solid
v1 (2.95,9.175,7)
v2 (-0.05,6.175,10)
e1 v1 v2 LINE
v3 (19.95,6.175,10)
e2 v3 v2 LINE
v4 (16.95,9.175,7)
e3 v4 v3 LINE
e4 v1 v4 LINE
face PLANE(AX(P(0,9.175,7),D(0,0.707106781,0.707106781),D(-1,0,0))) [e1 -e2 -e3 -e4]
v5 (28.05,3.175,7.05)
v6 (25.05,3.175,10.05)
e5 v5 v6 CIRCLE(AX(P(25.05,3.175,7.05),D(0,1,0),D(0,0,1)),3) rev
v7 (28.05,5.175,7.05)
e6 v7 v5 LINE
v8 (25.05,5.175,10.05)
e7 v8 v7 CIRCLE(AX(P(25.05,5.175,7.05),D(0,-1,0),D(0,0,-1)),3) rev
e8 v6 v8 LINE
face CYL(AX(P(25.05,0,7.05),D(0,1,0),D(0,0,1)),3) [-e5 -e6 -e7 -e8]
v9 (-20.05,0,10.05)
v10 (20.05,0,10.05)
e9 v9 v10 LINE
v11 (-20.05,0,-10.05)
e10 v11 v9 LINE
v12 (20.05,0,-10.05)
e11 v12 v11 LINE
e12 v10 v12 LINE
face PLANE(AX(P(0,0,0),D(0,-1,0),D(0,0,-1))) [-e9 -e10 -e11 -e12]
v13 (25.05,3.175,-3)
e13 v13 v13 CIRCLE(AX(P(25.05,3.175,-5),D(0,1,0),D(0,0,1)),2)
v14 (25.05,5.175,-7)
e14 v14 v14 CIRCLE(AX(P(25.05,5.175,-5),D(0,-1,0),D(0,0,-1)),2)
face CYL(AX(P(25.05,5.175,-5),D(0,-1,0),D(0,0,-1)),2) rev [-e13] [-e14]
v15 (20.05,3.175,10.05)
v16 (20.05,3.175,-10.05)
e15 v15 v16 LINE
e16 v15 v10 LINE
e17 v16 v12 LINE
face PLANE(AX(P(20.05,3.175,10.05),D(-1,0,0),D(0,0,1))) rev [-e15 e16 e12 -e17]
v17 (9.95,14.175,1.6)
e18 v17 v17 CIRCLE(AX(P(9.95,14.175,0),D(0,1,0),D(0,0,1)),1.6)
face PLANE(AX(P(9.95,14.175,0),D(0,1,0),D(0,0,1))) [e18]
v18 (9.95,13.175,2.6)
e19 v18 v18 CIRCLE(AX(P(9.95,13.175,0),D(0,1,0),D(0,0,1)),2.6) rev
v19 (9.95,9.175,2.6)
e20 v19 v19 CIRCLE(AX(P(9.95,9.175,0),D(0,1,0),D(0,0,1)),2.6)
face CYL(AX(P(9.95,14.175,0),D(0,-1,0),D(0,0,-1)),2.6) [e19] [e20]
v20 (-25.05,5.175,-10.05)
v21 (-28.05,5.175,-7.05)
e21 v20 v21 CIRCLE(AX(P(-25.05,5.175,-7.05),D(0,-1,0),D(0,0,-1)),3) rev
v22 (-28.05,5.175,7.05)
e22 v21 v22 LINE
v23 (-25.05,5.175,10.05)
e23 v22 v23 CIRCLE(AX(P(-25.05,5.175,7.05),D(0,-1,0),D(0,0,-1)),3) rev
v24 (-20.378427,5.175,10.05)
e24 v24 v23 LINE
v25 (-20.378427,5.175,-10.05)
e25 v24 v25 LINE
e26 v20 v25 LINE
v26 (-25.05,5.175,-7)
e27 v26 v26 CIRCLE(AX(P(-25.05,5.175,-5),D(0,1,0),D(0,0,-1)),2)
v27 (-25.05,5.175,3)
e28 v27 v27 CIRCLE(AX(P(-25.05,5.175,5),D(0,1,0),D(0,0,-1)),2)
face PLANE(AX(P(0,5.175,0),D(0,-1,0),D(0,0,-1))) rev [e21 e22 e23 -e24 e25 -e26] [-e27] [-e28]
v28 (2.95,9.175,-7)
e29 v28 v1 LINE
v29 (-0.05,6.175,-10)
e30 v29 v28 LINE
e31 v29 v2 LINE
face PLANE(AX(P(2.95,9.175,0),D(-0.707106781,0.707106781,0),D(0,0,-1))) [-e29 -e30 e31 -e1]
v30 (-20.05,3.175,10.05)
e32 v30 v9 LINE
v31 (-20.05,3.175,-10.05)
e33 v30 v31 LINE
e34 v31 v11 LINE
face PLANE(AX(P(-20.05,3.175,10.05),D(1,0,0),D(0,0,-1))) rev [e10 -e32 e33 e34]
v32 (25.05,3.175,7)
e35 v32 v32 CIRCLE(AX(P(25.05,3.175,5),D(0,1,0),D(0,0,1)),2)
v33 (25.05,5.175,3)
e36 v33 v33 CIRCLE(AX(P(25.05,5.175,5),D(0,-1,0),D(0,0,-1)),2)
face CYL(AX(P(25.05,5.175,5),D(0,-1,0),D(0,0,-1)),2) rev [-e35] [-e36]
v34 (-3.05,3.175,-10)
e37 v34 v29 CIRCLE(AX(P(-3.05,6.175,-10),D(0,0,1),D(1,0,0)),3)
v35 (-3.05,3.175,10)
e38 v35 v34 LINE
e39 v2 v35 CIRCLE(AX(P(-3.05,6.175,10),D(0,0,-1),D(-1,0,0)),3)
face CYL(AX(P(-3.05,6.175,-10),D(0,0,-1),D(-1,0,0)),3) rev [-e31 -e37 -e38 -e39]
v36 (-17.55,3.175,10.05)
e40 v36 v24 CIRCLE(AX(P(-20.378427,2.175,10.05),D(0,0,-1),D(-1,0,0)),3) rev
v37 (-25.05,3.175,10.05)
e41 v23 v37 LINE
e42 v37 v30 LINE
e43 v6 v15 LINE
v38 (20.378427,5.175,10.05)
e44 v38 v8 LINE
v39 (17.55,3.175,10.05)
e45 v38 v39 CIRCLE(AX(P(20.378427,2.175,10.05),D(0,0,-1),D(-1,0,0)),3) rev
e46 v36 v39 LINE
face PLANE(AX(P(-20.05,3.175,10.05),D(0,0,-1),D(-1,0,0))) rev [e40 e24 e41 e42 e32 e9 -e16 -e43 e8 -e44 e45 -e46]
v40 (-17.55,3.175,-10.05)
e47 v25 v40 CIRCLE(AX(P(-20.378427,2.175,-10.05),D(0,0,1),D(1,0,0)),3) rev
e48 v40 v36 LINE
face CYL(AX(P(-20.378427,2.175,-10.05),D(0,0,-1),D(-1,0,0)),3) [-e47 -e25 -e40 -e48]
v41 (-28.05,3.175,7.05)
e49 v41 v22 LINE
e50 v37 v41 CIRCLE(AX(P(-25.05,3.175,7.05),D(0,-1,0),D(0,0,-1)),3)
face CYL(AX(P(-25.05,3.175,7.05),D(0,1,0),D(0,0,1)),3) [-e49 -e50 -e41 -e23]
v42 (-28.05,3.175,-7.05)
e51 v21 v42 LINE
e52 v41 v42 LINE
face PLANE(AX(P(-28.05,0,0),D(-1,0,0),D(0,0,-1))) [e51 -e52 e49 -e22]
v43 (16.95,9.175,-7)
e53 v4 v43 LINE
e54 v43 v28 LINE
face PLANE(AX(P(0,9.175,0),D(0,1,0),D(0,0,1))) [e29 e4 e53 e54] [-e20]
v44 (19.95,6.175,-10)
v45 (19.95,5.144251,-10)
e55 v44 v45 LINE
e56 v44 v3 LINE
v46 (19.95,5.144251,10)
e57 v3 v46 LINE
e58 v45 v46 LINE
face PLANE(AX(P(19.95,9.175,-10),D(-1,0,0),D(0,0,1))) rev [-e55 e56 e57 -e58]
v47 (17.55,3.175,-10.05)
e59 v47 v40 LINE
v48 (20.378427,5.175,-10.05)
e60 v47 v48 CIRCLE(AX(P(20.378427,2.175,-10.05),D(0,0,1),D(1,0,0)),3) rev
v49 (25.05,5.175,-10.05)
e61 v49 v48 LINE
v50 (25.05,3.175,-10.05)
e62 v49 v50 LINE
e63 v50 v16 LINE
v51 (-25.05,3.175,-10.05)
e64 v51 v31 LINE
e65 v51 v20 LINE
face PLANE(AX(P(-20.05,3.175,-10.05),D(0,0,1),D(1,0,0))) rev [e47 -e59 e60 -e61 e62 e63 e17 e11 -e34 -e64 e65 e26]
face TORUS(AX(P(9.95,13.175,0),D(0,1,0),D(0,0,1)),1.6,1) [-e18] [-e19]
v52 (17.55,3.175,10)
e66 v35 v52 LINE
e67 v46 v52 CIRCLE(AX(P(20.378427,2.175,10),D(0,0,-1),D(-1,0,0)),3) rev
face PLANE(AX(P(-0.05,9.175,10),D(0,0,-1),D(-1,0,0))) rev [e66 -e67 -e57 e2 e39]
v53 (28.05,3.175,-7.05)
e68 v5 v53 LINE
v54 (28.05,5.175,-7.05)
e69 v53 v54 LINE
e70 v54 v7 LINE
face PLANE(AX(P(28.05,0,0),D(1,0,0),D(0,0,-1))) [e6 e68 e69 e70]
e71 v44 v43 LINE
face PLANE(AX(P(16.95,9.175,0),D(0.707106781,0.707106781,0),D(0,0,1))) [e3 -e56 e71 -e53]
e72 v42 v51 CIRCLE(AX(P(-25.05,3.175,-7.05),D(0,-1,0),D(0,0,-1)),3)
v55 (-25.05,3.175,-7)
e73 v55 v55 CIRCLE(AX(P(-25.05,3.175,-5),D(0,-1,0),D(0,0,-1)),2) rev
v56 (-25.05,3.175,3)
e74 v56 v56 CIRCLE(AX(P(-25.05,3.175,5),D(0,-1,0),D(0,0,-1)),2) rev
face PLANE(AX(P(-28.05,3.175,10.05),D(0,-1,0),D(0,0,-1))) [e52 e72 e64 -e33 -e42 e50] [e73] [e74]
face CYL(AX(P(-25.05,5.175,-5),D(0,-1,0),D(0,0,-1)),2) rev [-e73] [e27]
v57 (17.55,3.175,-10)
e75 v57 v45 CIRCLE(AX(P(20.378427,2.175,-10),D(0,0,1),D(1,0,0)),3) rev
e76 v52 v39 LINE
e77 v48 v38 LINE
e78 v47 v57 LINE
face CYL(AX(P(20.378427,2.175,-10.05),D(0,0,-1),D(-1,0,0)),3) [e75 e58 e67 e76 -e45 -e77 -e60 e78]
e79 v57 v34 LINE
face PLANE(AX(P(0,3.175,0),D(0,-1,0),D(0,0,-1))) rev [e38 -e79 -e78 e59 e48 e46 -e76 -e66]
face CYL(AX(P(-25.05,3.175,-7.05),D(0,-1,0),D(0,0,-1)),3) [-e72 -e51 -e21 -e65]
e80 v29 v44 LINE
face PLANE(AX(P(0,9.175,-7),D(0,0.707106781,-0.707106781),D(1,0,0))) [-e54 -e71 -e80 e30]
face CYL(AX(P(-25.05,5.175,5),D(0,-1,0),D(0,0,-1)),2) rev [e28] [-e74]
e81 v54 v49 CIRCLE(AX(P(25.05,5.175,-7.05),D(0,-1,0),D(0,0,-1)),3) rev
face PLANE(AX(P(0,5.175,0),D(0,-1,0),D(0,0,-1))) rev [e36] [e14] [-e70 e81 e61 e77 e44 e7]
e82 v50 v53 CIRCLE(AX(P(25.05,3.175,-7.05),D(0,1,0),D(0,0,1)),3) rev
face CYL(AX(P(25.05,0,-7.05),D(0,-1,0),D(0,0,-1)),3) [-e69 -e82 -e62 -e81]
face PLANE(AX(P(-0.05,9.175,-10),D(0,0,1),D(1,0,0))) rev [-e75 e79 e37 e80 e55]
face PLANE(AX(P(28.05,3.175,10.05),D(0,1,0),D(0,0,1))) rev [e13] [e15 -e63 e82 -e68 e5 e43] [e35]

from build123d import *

# Parameters (mm, degrees)
SKETCH1_W            = 40.1
SKETCH1_H            = 20.1
BOSS_EXTRUDE1_DEPTH  = 3.175
SKETCH2_W            = 2.5
SKETCH2_H            = 20.1
BOSS_EXTRUDE2_DEPTH  = 2
SKETCH3_W            = 20.1
SKETCH3_H            = 2
BOSS_EXTRUDE3_DEPTH  = 8
SKETCH4_R            = 2
CUT_EXTRUDE1_DEPTH   = 30.964739695
FILLET1_R            = 3
FILLET2_R            = 3
FILLET1_OF_MIRROR2_R = 3
FILLET2_OF_MIRROR2_R = 3
SKETCH7_W            = 20
SKETCH7_H            = 20
BOSS_EXTRUDE5_DEPTH  = 6
SKETCH5_R            = 2.6
BOSS_EXTRUDE4_DEPTH  = 5
FILLET4_R            = 3
CHAMFER1_SIZE        = 3
FILLET5_R            = 1


# Some blends are built 0.0001 mm under size
with BuildPart() as part:
    # Sketch1 → Boss-Extrude1 (new body)
    with BuildSketch(Plane(origin=(0, 0, 0), x_dir=(1, 0, 0), z_dir=(0, 1, 0))):
        Rectangle(SKETCH1_W, SKETCH1_H)
    extrude(amount=BOSS_EXTRUDE1_DEPTH)

    # Sketch2 → Boss-Extrude2 (add)
    with BuildSketch(Plane(origin=(0, 3.175, 0), x_dir=(1, 0, 0), z_dir=(0, 1, 0))):
        with Locations((18.8, 0)):
            Rectangle(SKETCH2_W, SKETCH2_H)
    boss_extrude2 = extrude(amount=BOSS_EXTRUDE2_DEPTH)

    # Sketch3 → Boss-Extrude3 (add)
    with BuildSketch(Plane(origin=(20.05, 0, 0), x_dir=(0, 0, -1), z_dir=(1, 0, 0))):
        with Locations((0, 4.175)):
            Rectangle(SKETCH3_W, SKETCH3_H)
    boss_extrude3 = extrude(amount=BOSS_EXTRUDE3_DEPTH)

    # Sketch4 → Cut-Extrude1 (cut, symmetric)
    with BuildSketch(Plane.XZ.offset(-3.175)):
        with Locations(Location((25.05, 5, 0), (0, 0, 270))):
            Circle(SKETCH4_R)
        with Locations(Location((25.05, -5, 0), (0, 0, 270))):
            Circle(SKETCH4_R)
    cut_extrude1 = extrude(amount=CUT_EXTRUDE1_DEPTH, both=True, mode=Mode.SUBTRACT)

    # Fillet1
    # the kernel refuses this fillet: 3 mm, written as the material it takes off along each edge
    with BuildSketch(Plane(origin=(17.55, 5.175, -17.121067812), x_dir=(0, -1, 0), z_dir=(0, 0, 1))) as fillet1_piece_1:
        with BuildLine():
            CenterArc((3, 2.828427125), FILLET1_R, 180, 70.528779366)
            Line((0, 2.828427125), (-0.06, 2.828427125))
            Line((-0.06, 2.828427125), (-0.06, 0))
            Line((-0.06, 0), (0, -0.06))
            ThreePointArc((0, -0.06), (1, -0.06), (1.98, -0.056568542))
            Line((1.98, -0.056568542), (2, 0))
        make_face()
    extrude(amount=34.242135624, mode=Mode.SUBTRACT)

    # Fillet2
    fillet2_edges = [part.edges().sort_by_distance(p)[0] for p in [
        (28.05, 4.175, 10.05),
        (28.05, 4.175, -10.05),
    ]]
    fillet(fillet2_edges, radius=FILLET2_R)

    # Mirror2: Boss-Extrude2, Boss-Extrude3, Cut-Extrude1 across plane
    add(boss_extrude2.mirror(Plane(origin=(0, 0, 0), x_dir=(0, 0, 1), z_dir=(1, 0, 0))))
    add(boss_extrude3.mirror(Plane(origin=(0, 0, 0), x_dir=(0, 0, 1), z_dir=(1, 0, 0))))
    add(cut_extrude1.mirror(Plane(origin=(0, 0, 0), x_dir=(0, 0, 1), z_dir=(1, 0, 0))), mode=Mode.SUBTRACT)

    # Fillet1 of Mirror2
    # the kernel refuses this fillet: 3 mm, written as the material it takes off along each edge
    with BuildSketch(Plane(origin=(-17.55, 5.175, -17.121067812), x_dir=(-1, 0, 0), z_dir=(0, 0, 1))) as fillet1_of_mirror2_piece_1:
        with BuildLine():
            CenterArc((2.828427125, 3), FILLET1_OF_MIRROR2_R, 199.471220634, 70.528779366)
            Line((0, 2), (-0.056568542, 1.98))
            ThreePointArc((-0.056568542, 1.98), (-0.06, 1), (-0.06, 0))
            Line((-0.06, 0), (0, -0.06))
            Line((0, -0.06), (2.828427125, -0.06))
            Line((2.828427125, -0.06), (2.828427125, 0))
        make_face()
    extrude(amount=34.242135624, mode=Mode.SUBTRACT)

    # Fillet2 of Mirror2
    fillet2_of_mirror2_edges = [part.edges().sort_by_distance(p)[0] for p in [
        (-28.05, 4.175, 10.05),
        (-28.05, 4.175, -10.05),
    ]]
    fillet(fillet2_of_mirror2_edges, radius=FILLET2_OF_MIRROR2_R)

    # Sketch7 → Boss-Extrude5 (add)
    with BuildSketch(Plane(origin=(0, 3.175, 0), x_dir=(1, 0, 0), z_dir=(0, 1, 0))):
        with Locations((9.95, 0)):
            Rectangle(SKETCH7_W, SKETCH7_H)
    extrude(amount=BOSS_EXTRUDE5_DEPTH)

    # Sketch5 → Boss-Extrude4 (add)
    with BuildSketch(Plane(origin=(0, 9.175, 0), x_dir=(1, 0, 0), z_dir=(0, 1, 0))):
        with Locations(Location((9.95, 0, 0), (0, 0, 270))):
            Circle(SKETCH5_R)
    extrude(amount=BOSS_EXTRUDE4_DEPTH)

    # Fillet4
    fillet4_edges = [part.edges().sort_by_distance(p)[0] for p in [
        (-0.05, 3.175, 0),
    ]]
    fillet(fillet4_edges, radius=FILLET4_R)

    # Chamfer1
    chamfer1_edges = [part.edges().sort_by_distance(p)[0] for p in [
        (19.95, 9.175, 0),
        (9.95, 9.175, -10),
        (-0.05, 9.175, 0),
        (9.95, 9.175, 10),
    ]]
    chamfer(chamfer1_edges, length=CHAMFER1_SIZE - 0.0001)  # a hair under: the kernel refuses the full size

    # Fillet5
    fillet5_edges = [part.edges().sort_by_distance(p)[0] for p in [
        (9.95, 14.175, -2.6),
    ]]
    fillet(fillet5_edges, radius=FILLET5_R)


solid = part.part
